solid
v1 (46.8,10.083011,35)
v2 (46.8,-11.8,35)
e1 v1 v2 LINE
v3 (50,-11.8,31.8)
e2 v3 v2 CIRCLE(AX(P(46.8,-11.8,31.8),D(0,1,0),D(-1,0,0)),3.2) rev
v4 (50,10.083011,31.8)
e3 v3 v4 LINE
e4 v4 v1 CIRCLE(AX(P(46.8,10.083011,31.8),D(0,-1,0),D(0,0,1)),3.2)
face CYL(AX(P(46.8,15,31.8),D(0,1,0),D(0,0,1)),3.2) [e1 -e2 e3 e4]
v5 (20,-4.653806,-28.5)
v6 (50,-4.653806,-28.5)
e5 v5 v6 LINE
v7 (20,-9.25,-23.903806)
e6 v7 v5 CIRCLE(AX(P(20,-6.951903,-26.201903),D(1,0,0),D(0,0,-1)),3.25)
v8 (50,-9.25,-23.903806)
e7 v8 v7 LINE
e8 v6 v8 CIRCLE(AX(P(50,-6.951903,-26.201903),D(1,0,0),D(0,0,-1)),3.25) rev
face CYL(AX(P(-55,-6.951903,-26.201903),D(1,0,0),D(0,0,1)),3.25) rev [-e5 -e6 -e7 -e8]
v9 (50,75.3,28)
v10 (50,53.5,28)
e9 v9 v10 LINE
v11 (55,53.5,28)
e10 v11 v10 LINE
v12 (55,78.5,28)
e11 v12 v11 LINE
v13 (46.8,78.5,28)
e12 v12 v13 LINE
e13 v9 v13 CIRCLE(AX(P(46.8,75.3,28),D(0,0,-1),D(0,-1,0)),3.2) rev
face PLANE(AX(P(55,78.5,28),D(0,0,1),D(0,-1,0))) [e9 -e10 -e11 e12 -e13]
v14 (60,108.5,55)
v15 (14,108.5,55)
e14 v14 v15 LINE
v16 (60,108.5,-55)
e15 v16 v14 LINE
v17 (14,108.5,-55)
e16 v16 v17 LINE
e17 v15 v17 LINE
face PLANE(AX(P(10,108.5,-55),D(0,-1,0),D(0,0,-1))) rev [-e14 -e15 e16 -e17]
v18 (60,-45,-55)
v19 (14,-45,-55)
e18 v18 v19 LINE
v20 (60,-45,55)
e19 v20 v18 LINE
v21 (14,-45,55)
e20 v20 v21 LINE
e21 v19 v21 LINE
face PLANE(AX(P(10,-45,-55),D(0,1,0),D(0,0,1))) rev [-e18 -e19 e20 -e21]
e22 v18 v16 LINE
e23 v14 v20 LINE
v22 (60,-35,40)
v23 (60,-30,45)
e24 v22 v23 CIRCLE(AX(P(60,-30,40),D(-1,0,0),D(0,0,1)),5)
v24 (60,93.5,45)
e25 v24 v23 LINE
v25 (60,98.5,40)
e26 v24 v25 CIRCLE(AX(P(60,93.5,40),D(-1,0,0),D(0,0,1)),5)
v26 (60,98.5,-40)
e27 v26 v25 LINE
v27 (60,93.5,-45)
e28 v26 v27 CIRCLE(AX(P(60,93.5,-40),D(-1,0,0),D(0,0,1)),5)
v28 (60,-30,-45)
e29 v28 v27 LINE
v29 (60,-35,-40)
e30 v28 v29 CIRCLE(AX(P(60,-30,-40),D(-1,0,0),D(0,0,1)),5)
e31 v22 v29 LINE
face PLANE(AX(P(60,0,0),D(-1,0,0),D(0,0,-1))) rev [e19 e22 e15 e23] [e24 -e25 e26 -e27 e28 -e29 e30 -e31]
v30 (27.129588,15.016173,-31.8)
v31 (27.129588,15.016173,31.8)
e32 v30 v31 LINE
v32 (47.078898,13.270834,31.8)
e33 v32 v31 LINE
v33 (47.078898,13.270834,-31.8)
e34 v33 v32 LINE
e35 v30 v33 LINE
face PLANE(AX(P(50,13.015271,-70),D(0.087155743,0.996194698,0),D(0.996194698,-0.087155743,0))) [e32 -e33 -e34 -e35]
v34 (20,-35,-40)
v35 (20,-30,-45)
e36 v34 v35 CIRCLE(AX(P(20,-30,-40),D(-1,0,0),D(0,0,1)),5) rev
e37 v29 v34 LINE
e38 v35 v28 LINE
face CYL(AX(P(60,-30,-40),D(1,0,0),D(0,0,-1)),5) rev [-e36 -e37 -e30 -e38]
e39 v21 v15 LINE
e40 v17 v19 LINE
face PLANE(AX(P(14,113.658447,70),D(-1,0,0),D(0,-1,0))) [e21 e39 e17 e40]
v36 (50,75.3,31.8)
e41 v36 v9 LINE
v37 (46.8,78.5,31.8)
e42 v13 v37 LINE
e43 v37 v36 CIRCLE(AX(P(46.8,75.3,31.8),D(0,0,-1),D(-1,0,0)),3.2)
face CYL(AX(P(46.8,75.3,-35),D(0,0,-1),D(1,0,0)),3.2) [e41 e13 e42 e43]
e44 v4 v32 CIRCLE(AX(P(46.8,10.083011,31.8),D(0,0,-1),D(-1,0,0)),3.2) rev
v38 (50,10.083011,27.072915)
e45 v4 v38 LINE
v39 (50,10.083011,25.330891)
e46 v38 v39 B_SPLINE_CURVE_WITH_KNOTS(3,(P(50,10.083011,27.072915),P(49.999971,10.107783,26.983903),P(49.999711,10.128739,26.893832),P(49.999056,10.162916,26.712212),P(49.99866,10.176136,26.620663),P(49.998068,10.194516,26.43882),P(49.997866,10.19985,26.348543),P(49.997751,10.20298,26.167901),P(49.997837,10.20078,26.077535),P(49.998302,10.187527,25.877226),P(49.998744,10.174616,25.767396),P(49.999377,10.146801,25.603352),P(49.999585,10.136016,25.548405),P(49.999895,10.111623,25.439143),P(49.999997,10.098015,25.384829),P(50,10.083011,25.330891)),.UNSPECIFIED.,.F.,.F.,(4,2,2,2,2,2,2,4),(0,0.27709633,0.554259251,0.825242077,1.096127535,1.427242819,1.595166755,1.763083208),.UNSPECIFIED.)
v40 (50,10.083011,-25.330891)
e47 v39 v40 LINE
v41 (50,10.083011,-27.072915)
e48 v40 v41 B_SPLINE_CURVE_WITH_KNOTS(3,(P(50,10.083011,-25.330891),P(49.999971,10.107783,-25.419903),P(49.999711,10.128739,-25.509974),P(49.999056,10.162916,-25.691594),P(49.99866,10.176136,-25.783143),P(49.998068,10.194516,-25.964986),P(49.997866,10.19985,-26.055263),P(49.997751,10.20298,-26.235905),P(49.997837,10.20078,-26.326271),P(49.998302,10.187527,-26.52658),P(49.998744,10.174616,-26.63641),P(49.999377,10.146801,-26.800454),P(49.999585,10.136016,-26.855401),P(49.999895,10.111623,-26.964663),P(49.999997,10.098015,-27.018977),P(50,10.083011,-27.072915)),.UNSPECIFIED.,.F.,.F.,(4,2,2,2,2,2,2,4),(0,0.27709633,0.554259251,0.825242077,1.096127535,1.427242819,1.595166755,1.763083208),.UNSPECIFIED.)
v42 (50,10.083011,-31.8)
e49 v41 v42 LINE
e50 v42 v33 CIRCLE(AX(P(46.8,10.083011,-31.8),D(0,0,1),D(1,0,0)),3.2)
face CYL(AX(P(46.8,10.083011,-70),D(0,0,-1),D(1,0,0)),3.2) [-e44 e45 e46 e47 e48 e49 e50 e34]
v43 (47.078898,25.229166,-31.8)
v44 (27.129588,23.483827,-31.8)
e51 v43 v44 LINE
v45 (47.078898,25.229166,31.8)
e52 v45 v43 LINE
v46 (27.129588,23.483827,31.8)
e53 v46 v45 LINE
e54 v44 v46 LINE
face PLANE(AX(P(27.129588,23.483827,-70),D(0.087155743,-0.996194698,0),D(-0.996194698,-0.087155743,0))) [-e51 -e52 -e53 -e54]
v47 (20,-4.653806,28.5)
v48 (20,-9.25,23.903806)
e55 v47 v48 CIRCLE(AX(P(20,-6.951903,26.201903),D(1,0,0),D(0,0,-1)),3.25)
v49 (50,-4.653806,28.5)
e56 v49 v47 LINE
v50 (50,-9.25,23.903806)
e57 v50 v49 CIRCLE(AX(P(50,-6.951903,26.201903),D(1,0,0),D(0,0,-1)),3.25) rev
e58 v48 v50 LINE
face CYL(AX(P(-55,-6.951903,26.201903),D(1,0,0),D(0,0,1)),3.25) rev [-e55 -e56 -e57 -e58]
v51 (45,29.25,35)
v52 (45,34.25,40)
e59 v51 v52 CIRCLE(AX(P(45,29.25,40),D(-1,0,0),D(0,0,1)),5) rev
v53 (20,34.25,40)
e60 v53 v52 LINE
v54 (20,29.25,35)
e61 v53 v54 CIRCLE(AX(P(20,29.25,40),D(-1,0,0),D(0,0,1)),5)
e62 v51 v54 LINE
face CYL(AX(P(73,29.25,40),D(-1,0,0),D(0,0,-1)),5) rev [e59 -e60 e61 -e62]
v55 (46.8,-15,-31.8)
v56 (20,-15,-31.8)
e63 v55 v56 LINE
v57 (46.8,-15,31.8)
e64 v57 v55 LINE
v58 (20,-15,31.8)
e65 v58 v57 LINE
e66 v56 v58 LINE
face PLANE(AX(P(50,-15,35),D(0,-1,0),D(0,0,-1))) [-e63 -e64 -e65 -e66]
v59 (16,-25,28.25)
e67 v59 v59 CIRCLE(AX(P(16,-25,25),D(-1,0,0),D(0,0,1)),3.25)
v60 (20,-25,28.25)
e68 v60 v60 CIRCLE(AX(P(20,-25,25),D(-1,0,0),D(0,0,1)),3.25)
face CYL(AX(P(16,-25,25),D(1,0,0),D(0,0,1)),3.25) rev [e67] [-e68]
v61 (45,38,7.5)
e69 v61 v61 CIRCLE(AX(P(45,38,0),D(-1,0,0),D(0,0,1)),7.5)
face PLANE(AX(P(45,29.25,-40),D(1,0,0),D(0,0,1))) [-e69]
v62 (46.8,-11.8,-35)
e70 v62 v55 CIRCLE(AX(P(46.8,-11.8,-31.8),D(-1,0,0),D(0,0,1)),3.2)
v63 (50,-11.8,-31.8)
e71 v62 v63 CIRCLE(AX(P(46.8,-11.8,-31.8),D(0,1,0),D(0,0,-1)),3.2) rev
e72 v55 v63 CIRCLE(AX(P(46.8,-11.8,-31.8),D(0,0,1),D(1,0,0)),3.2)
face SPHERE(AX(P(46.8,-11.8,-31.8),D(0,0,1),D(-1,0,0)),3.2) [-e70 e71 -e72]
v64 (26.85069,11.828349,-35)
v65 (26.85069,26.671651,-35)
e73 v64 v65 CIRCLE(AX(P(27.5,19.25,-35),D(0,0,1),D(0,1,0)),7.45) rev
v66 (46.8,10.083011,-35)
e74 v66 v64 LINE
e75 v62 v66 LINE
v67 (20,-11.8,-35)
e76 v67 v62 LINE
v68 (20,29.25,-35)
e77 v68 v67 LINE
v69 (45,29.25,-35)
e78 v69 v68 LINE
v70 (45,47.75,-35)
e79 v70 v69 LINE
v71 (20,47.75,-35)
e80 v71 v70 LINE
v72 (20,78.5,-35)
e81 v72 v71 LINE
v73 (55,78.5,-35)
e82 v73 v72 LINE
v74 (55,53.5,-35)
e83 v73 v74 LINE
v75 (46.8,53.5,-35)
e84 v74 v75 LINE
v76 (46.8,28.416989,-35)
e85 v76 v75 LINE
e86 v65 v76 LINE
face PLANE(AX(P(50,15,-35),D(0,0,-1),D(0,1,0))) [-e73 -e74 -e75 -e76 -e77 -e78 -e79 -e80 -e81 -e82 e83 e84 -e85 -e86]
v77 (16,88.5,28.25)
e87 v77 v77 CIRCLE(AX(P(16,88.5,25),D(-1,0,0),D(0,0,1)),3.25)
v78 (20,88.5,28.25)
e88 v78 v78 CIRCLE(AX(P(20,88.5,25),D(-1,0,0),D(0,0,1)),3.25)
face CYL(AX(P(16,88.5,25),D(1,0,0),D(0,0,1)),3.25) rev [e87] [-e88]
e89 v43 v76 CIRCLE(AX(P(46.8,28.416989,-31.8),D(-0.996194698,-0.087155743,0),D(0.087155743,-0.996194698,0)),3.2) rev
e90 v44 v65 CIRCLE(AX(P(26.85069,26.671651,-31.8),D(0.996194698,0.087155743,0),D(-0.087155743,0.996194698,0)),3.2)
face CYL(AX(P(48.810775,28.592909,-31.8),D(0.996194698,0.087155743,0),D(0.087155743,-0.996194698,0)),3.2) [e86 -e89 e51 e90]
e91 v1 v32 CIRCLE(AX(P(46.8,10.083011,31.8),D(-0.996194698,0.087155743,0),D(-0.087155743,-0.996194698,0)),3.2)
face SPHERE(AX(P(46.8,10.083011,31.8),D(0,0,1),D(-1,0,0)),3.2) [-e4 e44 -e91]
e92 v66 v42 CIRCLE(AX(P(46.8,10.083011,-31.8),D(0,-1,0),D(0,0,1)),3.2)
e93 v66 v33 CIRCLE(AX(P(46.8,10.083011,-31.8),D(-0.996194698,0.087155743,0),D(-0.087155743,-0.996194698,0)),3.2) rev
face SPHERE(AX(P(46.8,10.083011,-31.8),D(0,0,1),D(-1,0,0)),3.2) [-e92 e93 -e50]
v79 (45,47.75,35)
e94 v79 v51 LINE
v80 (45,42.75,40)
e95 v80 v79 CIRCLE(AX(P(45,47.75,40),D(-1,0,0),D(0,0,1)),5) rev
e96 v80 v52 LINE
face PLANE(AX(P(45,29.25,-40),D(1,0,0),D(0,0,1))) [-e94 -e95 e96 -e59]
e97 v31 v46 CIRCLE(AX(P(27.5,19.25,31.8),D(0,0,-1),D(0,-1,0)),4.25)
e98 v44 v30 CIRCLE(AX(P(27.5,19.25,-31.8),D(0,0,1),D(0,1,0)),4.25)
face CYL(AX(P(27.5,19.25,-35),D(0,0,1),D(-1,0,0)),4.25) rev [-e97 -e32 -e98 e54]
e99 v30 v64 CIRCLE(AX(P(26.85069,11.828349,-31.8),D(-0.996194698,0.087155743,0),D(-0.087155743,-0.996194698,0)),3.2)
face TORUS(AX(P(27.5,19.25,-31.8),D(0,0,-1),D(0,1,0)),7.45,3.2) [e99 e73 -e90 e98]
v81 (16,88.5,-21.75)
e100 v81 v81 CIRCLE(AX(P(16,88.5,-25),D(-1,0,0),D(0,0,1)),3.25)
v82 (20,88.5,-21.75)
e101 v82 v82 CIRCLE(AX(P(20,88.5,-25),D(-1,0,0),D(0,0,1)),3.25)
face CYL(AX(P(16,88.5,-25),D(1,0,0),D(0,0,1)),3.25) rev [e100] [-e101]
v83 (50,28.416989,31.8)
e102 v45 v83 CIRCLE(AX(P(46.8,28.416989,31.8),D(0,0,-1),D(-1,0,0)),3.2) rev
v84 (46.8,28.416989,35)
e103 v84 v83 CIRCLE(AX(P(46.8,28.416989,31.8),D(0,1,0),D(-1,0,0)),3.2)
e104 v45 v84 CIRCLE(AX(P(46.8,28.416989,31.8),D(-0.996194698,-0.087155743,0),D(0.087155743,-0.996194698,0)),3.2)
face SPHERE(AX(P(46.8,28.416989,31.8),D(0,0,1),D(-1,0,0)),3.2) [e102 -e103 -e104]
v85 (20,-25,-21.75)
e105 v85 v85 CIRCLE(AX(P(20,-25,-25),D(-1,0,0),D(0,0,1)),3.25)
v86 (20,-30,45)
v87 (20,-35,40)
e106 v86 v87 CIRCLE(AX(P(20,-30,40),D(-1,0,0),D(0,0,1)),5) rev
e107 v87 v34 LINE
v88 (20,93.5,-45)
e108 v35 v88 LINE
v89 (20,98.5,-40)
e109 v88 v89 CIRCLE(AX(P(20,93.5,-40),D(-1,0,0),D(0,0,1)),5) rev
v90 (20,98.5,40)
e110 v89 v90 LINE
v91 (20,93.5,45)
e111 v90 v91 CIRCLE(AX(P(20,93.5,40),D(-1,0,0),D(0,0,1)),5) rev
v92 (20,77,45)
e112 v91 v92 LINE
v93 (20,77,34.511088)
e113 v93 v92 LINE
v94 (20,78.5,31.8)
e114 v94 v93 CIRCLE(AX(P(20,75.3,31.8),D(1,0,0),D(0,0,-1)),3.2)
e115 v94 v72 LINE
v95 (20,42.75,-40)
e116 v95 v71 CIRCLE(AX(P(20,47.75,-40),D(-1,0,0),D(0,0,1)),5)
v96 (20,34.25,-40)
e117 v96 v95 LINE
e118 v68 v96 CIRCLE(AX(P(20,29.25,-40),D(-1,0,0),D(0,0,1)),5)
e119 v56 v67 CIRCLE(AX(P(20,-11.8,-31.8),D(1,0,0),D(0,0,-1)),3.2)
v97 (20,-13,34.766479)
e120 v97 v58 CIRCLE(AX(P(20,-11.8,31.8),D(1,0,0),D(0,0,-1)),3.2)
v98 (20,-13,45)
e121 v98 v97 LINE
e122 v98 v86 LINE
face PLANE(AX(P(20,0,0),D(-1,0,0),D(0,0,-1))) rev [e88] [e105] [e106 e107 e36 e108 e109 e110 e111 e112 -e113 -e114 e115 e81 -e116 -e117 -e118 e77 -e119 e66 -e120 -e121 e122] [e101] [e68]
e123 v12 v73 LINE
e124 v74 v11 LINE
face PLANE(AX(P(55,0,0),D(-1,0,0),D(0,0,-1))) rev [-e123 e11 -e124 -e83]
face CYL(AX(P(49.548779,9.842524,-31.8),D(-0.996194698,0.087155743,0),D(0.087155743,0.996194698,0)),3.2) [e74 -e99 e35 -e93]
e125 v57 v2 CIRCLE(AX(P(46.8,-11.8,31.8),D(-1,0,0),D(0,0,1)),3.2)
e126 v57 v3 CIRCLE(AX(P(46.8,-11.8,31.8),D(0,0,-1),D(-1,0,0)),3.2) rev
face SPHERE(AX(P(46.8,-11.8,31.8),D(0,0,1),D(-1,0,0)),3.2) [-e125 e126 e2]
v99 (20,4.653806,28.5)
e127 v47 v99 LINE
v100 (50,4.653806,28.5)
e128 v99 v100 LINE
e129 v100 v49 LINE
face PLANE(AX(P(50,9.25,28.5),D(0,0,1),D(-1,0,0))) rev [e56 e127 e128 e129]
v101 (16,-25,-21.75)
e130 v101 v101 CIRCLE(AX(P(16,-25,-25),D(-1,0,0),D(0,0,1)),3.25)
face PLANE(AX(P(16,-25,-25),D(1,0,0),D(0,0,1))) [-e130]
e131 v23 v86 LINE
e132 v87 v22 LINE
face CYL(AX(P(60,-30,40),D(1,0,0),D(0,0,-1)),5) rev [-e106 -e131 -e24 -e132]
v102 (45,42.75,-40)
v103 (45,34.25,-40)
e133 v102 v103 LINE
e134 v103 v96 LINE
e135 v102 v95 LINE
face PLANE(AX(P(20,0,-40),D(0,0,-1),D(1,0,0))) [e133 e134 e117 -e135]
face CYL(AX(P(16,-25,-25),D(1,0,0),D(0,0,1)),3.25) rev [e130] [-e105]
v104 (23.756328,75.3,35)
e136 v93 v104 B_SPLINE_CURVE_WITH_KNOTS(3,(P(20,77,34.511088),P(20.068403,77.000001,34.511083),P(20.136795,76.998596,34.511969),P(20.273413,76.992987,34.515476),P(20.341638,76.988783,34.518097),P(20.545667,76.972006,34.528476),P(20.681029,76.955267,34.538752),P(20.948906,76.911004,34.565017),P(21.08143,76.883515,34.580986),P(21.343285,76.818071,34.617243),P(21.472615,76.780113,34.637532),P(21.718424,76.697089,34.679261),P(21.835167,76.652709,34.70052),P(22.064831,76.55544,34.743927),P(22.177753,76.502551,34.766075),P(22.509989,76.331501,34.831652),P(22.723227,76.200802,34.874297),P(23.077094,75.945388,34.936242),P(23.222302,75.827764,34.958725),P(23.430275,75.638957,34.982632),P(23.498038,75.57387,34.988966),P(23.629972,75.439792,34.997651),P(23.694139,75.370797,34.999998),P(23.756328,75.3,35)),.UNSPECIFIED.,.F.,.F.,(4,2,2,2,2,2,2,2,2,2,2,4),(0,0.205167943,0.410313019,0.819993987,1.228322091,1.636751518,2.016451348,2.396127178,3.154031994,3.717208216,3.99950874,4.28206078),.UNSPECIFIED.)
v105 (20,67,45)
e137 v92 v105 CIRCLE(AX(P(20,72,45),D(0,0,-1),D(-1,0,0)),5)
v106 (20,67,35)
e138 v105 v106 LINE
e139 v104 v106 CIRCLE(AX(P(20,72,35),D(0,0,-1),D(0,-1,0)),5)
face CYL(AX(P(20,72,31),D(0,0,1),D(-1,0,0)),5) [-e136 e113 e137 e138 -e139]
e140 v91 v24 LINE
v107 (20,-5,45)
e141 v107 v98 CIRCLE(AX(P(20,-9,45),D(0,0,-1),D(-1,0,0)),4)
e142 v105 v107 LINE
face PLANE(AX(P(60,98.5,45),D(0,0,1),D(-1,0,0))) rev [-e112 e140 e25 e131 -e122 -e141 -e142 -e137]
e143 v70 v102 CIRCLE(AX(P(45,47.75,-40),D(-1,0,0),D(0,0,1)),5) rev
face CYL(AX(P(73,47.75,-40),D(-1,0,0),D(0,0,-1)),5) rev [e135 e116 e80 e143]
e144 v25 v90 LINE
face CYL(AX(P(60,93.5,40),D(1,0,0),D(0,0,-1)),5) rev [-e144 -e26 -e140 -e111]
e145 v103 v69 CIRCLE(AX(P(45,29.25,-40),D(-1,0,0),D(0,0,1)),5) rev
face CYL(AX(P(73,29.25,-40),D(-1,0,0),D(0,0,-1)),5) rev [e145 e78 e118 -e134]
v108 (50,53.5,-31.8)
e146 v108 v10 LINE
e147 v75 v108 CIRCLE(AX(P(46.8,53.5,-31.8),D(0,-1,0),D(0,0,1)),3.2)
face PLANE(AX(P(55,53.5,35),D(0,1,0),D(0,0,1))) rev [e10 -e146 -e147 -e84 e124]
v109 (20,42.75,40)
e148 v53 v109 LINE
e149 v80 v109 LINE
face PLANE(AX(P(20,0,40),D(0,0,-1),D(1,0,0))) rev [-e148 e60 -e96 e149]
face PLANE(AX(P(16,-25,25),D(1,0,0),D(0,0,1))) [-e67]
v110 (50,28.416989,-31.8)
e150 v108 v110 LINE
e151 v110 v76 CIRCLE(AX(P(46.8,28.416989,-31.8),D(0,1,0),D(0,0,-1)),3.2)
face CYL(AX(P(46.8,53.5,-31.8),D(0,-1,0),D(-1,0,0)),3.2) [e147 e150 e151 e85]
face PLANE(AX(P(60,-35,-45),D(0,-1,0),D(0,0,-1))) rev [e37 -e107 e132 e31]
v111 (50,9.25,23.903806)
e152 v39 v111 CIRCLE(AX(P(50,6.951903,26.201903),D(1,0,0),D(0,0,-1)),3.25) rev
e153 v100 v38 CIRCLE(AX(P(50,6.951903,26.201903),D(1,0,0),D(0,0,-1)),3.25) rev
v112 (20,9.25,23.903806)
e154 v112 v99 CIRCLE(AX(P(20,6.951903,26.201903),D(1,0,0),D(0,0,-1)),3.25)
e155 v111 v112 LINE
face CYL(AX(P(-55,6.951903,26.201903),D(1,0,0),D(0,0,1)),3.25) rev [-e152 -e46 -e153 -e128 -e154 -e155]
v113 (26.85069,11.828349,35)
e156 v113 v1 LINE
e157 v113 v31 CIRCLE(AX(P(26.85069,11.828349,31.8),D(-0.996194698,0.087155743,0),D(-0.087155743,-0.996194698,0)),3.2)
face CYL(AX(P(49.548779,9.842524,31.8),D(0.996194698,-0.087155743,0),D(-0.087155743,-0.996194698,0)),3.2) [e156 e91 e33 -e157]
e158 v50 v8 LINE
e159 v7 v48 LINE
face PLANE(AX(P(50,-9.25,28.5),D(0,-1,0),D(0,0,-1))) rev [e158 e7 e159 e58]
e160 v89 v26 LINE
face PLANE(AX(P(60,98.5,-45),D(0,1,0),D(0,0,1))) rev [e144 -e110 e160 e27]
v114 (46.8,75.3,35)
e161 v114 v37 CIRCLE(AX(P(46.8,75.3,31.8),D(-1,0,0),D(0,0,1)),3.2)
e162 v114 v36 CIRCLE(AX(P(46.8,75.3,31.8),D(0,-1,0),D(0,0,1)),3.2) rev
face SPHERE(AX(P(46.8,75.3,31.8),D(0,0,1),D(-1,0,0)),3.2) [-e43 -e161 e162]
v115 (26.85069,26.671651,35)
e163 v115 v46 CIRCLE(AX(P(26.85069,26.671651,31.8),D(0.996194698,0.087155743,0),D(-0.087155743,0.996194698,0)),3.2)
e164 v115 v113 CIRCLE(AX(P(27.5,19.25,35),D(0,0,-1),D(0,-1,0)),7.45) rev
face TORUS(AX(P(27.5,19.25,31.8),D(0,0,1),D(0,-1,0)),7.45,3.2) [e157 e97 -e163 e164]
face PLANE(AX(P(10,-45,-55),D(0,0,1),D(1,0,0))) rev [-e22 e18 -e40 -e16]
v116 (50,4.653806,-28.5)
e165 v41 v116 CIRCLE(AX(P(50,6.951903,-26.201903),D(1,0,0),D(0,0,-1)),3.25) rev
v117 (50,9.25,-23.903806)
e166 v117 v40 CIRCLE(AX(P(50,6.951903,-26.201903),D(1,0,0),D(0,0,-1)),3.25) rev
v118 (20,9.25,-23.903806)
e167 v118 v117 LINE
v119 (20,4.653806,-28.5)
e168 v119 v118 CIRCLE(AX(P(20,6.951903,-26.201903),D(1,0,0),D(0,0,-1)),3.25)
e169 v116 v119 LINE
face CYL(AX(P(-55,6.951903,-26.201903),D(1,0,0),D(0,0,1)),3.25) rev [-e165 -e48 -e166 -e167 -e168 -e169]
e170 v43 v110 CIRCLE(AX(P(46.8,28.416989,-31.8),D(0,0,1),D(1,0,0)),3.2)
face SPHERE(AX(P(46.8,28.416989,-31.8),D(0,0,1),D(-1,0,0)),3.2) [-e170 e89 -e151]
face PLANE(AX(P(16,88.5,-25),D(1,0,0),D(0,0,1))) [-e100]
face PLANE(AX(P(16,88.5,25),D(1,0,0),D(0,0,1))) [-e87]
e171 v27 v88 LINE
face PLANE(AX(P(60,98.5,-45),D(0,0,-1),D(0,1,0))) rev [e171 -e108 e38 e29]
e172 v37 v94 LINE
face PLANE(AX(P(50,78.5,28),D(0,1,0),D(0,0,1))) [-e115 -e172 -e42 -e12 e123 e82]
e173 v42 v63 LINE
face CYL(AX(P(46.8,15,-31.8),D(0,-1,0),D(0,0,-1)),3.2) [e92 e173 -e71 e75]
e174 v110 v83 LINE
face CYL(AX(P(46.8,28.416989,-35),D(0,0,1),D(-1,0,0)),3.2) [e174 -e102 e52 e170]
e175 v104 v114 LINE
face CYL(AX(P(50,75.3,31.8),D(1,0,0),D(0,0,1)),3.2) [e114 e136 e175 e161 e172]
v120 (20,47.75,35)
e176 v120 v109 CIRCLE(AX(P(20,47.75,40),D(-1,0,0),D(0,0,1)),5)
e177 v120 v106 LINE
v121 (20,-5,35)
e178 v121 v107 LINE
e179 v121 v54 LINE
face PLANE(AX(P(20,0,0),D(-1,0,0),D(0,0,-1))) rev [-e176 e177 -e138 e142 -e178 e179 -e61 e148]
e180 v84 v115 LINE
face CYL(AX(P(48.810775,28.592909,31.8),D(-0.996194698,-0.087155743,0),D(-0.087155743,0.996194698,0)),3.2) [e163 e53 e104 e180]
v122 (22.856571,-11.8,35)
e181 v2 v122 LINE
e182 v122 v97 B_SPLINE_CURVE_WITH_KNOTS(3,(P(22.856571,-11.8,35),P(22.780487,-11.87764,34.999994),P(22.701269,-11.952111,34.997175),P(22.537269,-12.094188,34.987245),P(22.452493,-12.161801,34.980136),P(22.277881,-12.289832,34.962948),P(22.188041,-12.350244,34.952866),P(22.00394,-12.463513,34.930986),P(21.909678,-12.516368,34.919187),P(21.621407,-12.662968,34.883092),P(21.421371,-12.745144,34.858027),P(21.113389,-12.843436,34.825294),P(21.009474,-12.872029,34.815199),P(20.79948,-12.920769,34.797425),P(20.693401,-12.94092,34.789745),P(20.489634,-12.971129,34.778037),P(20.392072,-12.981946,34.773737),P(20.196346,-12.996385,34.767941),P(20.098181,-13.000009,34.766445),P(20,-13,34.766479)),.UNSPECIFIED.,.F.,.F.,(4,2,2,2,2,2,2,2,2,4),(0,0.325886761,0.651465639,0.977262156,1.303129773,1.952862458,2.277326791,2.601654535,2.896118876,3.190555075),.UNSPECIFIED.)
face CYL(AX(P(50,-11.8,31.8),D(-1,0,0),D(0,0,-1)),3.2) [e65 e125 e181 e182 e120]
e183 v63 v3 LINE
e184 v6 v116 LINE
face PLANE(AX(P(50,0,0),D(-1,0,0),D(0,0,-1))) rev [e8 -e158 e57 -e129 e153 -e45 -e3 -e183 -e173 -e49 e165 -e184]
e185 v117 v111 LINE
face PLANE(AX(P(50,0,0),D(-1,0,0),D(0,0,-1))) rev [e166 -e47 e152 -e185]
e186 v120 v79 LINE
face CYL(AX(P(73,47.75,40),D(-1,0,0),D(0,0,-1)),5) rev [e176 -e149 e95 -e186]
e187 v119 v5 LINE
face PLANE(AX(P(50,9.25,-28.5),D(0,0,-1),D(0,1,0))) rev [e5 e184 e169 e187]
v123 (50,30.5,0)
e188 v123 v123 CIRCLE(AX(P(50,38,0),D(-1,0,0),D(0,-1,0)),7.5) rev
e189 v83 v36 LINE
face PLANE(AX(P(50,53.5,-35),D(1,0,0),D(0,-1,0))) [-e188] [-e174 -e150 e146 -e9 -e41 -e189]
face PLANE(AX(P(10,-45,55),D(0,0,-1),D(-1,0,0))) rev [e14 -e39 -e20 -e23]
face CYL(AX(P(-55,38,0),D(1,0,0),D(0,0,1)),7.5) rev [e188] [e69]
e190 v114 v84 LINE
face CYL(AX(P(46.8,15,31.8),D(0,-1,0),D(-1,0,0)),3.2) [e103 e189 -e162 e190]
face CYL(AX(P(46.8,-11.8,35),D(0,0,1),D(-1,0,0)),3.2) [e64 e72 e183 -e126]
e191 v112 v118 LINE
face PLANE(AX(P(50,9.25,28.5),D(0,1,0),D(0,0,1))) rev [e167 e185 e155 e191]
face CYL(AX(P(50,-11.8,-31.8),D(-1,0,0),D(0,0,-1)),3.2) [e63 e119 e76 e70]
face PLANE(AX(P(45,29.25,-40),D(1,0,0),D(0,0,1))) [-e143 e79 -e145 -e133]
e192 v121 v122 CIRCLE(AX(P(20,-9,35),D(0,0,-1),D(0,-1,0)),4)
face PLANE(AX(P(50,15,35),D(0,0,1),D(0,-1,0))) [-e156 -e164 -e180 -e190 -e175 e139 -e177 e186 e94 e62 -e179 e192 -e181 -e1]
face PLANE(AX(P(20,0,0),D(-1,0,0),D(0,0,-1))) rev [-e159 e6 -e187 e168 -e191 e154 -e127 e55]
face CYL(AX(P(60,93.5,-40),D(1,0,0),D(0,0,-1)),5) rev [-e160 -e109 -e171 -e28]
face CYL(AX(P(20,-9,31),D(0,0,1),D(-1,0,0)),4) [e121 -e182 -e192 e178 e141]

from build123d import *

# Parameters (mm, degrees)
BOSS_EXTRUDE1_DEPTH       = 30
BOSS_EXTRUDE1_DEPTH_BACK  = 30
SKETCH1_W                 = 70
SKETCH1_H                 = 30
SKETCH1_W_2               = 57
SKETCH1_H_2               = 18.5
BOSS_EXTRUDE2_DEPTH       = 35
BOSS_EXTRUDE2_DEPTH_BACK  = 35
SKETCH3_W                 = 60
SKETCH3_H                 = 30
SKETCH3_W_2               = 50
SKETCH3_H_2               = 18.5
BOSS_EXTRUDE3_DEPTH       = 35
BOSS_EXTRUDE3_DEPTH_BACK  = 35
SKETCH5_W                 = 60
SKETCH5_H                 = 25
SKETCH5_R                 = 7.95
BOSS_EXTRUDE4_DEPTH       = 7
CUT_EXTRUDE1_REACH        = 106.246
SKETCH6_W                 = 11
SKETCH6_H                 = 5
SKETCH7_W                 = 11
SKETCH7_H                 = 8.362797957
CUT_EXTRUDE2_DEPTH        = 6
FILLET2_R                 = 2
CUT_EXTRUDE3_DEPTH        = 105
CUT_EXTRUDE5_DEPTH        = 75
CUT_EXTRUDE5_DEPTH_BACK   = 75
SKETCH12_R                = 7.5
CUT_EXTRUDE6_DEPTH        = 75
CUT_EXTRUDE6_DEPTH_BACK   = 75
SKETCH13_R                = 3.25
SKETCH11_W                = 180.789243702
SKETCH11_H                = 203.682831454
CUT_EXTRUDE4_DEPTH        = 75
SKETCH14_W                = 110
SKETCH14_H                = 153.5
SKETCH14_W_2              = 90
SKETCH14_H_2              = 133.5
BOSS_EXTRUDE7_DEPTH       = 40
SKETCH15_W                = 110
SKETCH15_H                = 153.5
BOSS_EXTRUDE8_DEPTH       = 10
SKETCH16_W                = 70
SKETCH16_H                = 25
BOSS_EXTRUDE9_DEPTH       = 35
SKETCH18_W                = 7
SKETCH18_H                = 25
CUT_EXTRUDE8_DEPTH        = 5
FILLET9_R                 = 3.2
BOSS_EXTRUDE10_DEPTH      = 40
BOSS_EXTRUDE10_DEPTH_BACK = 40
SKETCH19_W                = 25
SKETCH19_H                = 18.5
CUT_EXTRUDE10_DEPTH       = 53
SKETCH26_R                = 3.25
CUT_EXTRUDE14_DEPTH       = 4
SKETCH28_R                = 5
SKETCH28_R_2              = 4
BOSS_EXTRUDE13_DEPTH      = 24
SKETCH23_W                = 160.880742473
SKETCH23_H                = 158.955075262
CUT_EXTRUDE13_DEPTH       = 132.519010033
FILLET10_R                = 5
CUT_EXTRUDE15_DEPTH       = 70
CUT_EXTRUDE15_DEPTH_BACK  = 80
SKETCH30_W                = 39.070468588
SKETCH30_H                = 169.95653836


with BuildPart() as part:
    # Sketch1 → Boss-Extrude1 (new, two sides: drawn at the far end of the back side and taken through both)
    with BuildSketch(Plane(origin=(0, 0, 0), x_dir=(0, 0, -1), z_dir=(1, 0, 0)).offset(-BOSS_EXTRUDE1_DEPTH_BACK)):
        Rectangle(SKETCH1_W, SKETCH1_H)
        Rectangle(SKETCH1_W_2, SKETCH1_H_2, mode=Mode.SUBTRACT)
    extrude(amount=BOSS_EXTRUDE1_DEPTH + BOSS_EXTRUDE1_DEPTH_BACK)



with BuildPart() as body_2:
    # Sketch3 → Boss-Extrude2 (new, two sides: drawn at the far end of the back side and taken through both)
    with BuildSketch(Plane.XY.offset(-BOSS_EXTRUDE2_DEPTH_BACK)):
        with Locations((0, 38.5)):
            Rectangle(SKETCH3_W, SKETCH3_H)
        with Locations((0, 38.5)):
            Rectangle(SKETCH3_W_2, SKETCH3_H_2, mode=Mode.SUBTRACT)
    extrude(amount=BOSS_EXTRUDE2_DEPTH + BOSS_EXTRUDE2_DEPTH_BACK)


with BuildPart() as part_1:
    add(part.part)

    add(body_2.part)  # Boss-Extrude3 merges body 2
    # Sketch4 → Boss-Extrude3 (add, two sides: drawn at the far end of the back side and taken through both)
    with BuildSketch(Plane.XY.offset(-BOSS_EXTRUDE3_DEPTH_BACK)):
        with BuildLine():
            Line((-7.5, 23.5), (7.5, 23.5))
            ThreePointArc((7.5, 23.5), (3.25, 19.25), (7.5, 15))
            Line((7.5, 15), (-7.5, 15))
            ThreePointArc((-7.5, 15), (-3.25, 19.25), (-7.5, 23.5))
        make_face()
    extrude(amount=BOSS_EXTRUDE3_DEPTH + BOSS_EXTRUDE3_DEPTH_BACK)

    # Sketch5 → Boss-Extrude4 (add)
    with BuildSketch(Plane.XY.offset(35)):
        with Locations((0, 66)):
            Rectangle(SKETCH5_W, SKETCH5_H)
        with Locations((-10.95, 63.975)):
            Circle(SKETCH5_R, mode=Mode.SUBTRACT)
        with Locations((10.95, 63.975)):
            Circle(SKETCH5_R, mode=Mode.SUBTRACT)
    extrude(amount=-BOSS_EXTRUDE4_DEPTH)

    # Cut-Extrude1: up to this face of the body (flat: up to its plane)
    cut_extrude1_end = Plane(part_1.part.faces().sort_by_distance((0, 53.5, -3.5))[0])
    # Sketch6 → Cut-Extrude1 (cut, up to the picked face)
    with BuildSketch(Plane(origin=(0, 78.5, 0), x_dir=(1, 0, 0), z_dir=(0, 1, 0)), mode=Mode.PRIVATE) as cut_extrude1_sk1:
        with Locations((0, -28)):
            Rectangle(SKETCH6_W, SKETCH6_H)
    cut_extrude1_tool1 = split(extrude(cut_extrude1_sk1.sketch, amount=-CUT_EXTRUDE1_REACH, mode=Mode.PRIVATE), bisect_by=cut_extrude1_end, keep=Keep.BOTH, mode=Mode.PRIVATE)
    add(cut_extrude1_tool1.solids().sort_by(Axis((0, 78.5, 28), (0, -1, 0)))[0], mode=Mode.SUBTRACT)

    # Sketch7 → Cut-Extrude2 (cut)
    with BuildSketch(Plane(origin=(0, 78.5, 0), x_dir=(1, 0, 0), z_dir=(0, 1, 0))):
        with Locations((0, -28.818601022)):
            Rectangle(SKETCH7_W, SKETCH7_H)
    extrude(amount=-CUT_EXTRUDE2_DEPTH, mode=Mode.SUBTRACT)

    # Fillet2
    fillet2_edges = [part_1.edges().sort_by_distance(p)[0] for p in [
        (-5.5, 55.843540774, 30.5),
        (5.5, 55.843540774, 30.5),
        (5.5, 71.131459226, 30.5),
        (-5.5, 71.131459226, 30.5),
        (-5.5, 75.5, 33),
        (5.5, 75.5, 33),
    ]]
    fillet(fillet2_edges, radius=FILLET2_R)

    # Sketch10 → Cut-Extrude3 (cut)
    with BuildSketch(Plane.XY.offset(35)):
        Polygon((30, 25.484729239), (30, 13.015270761), (7.129588093, 15.016172533), (7.129588093, 23.483827467), align=None)
    cut_extrude3 = extrude(amount=-CUT_EXTRUDE3_DEPTH, mode=Mode.SUBTRACT)

    # Mirror1: Cut-Extrude3 across plane
    add(cut_extrude3.mirror(Plane(origin=(0, 0, 0), x_dir=(0, 0, 1), z_dir=(1, 0, 0))), mode=Mode.SUBTRACT)

    # Sketch12 → Cut-Extrude5 (cut, two sides: drawn at the far end of the back side and taken through both)
    with BuildSketch(Plane(origin=(0, 0, 0), x_dir=(0, 0, -1), z_dir=(1, 0, 0)).offset(-CUT_EXTRUDE5_DEPTH_BACK)):
        with Locations(Location((0, 38, 0), (0, 0, 270))):
            Circle(SKETCH12_R)
    extrude(amount=CUT_EXTRUDE5_DEPTH + CUT_EXTRUDE5_DEPTH_BACK, mode=Mode.SUBTRACT)

    # Sketch13 → Cut-Extrude6 (cut, two sides: drawn at the far end of the back side and taken through both)
    with BuildSketch(Plane(origin=(0, 0, 0), x_dir=(0, 0, -1), z_dir=(1, 0, 0)).offset(-CUT_EXTRUDE6_DEPTH_BACK)):
        with Locations((-26.201902961, 6.951902961)):
            Circle(SKETCH13_R)
        with Locations((-26.201902961, -6.951902961)):
            Circle(SKETCH13_R)
        with Locations((26.201902961, 6.951902961)):
            Circle(SKETCH13_R)
        with Locations((26.201902961, -6.951902961)):
            Circle(SKETCH13_R)
    extrude(amount=CUT_EXTRUDE6_DEPTH + CUT_EXTRUDE6_DEPTH_BACK, mode=Mode.SUBTRACT)

    # Sketch11 → Cut-Extrude4 (cut)
    with BuildSketch(Plane(origin=(0, 0, 0), x_dir=(0, 0, -1), z_dir=(1, 0, 0))):
        Rectangle(SKETCH11_W, SKETCH11_H)
    extrude(amount=CUT_EXTRUDE4_DEPTH, mode=Mode.SUBTRACT)



with BuildPart() as body_2_2:
    # Sketch14 → Boss-Extrude7 (new body)
    with BuildSketch(Plane(origin=(0, 0, 0), x_dir=(0, 0, -1), z_dir=(1, 0, 0))):
        with Locations((0, 31.75)):
            Rectangle(SKETCH14_W, SKETCH14_H)
        with Locations((0, 31.75)):
            Rectangle(SKETCH14_W_2, SKETCH14_H_2, mode=Mode.SUBTRACT)
    extrude(amount=-BOSS_EXTRUDE7_DEPTH)


with BuildPart() as part_2:
    add(part_1.part)

    add(body_2_2.part)  # Boss-Extrude8 merges body 2 2
    # Sketch15 → Boss-Extrude8 (add)
    with BuildSketch(Plane(origin=(0, 0, 0), x_dir=(0, 0, -1), z_dir=(1, 0, 0))):
        with Locations((0, 31.75)):
            Rectangle(SKETCH15_W, SKETCH15_H)
    extrude(amount=BOSS_EXTRUDE8_DEPTH)

    # Sketch16 → Boss-Extrude9 (add)
    with BuildSketch(Plane.ZY):
        with Locations((0, 66)):
            Rectangle(SKETCH16_W, SKETCH16_H)
    extrude(amount=BOSS_EXTRUDE9_DEPTH)

    # Sketch18 → Cut-Extrude8 (cut)
    with BuildSketch(Plane.ZY.offset(30)):
        with Locations((31.5, 66)):
            Rectangle(SKETCH18_W, SKETCH18_H)
    extrude(amount=CUT_EXTRUDE8_DEPTH, mode=Mode.SUBTRACT)

    # Fillet9
    # the kernel refuses this fillet: 3.2 mm, written as the material it takes off along each edge
    with BuildSketch(Plane(origin=(-26.8, -11.8, 31.8), x_dir=(0, 0, 1), z_dir=(-1, 0, 0))) as fillet9_piece_1_section:
        Polygon((0, 0), (FILLET9_R, 0), (FILLET9_R, -FILLET9_R), (0, -FILLET9_R), align=None)
    fillet9_piece_1 = extrude(amount=FILLET9_R, mode=Mode.PRIVATE)
    fillet9_piece_1 = fillet9_piece_1 - Plane(origin=(-26.8, -11.8, 31.8), x_dir=(0, 0.7071067811865475, -0.7071067811865475), z_dir=(-1, 0, 0)) * Sphere(FILLET9_R, mode=Mode.PRIVATE)
    add(fillet9_piece_1, mode=Mode.SUBTRACT)
    with BuildSketch(Plane(origin=(-26.8, 10.083011004, 31.8), x_dir=(-0.08715574274765824, 0.9961946980917455, 0), z_dir=(0, 0, 1))) as fillet9_piece_2_section:
        Polygon((0, 0), (FILLET9_R, 0), (FILLET9_R, FILLET9_R * 0.916331174017), (FILLET9_R * 0.0871557427477, FILLET9_R * 0.996194698092), align=None)
    fillet9_piece_2 = extrude(amount=FILLET9_R, mode=Mode.PRIVATE)
    fillet9_piece_2 = fillet9_piece_2 - Plane(origin=(-26.8, 10.083011004, 31.8), x_dir=(0.737277336810124, -0.6755902076156602, 0), z_dir=(0, 0, 1)) * Sphere(FILLET9_R, mode=Mode.PRIVATE)
    add(fillet9_piece_2, mode=Mode.SUBTRACT)
    with BuildSketch(Plane(origin=(-26.8, 10.083011004, -31.8), x_dir=(-0.08715574274765824, 0.9961946980917455, 0), z_dir=(0, 0, -1))) as fillet9_piece_3_section:
        Polygon((0, 0), (FILLET9_R, 0), (FILLET9_R, -FILLET9_R * 0.916331174017), (FILLET9_R * 0.0871557427477, -FILLET9_R * 0.996194698092), align=None)
    fillet9_piece_3 = extrude(amount=FILLET9_R, mode=Mode.PRIVATE)
    fillet9_piece_3 = fillet9_piece_3 - Plane(origin=(-26.8, 10.083011004, -31.8), x_dir=(0.737277336810124, -0.6755902076156602, 0), z_dir=(0, 0, -1)) * Sphere(FILLET9_R, mode=Mode.PRIVATE)
    add(fillet9_piece_3, mode=Mode.SUBTRACT)
    with BuildSketch(Plane(origin=(-26.8, -11.8, -31.8), x_dir=(0, 0, -1), z_dir=(-1, 0, 0))) as fillet9_piece_4_section:
        Polygon((0, 0), (FILLET9_R, 0), (FILLET9_R, FILLET9_R), (0, FILLET9_R), align=None)
    fillet9_piece_4 = extrude(amount=FILLET9_R, mode=Mode.PRIVATE)
    fillet9_piece_4 = fillet9_piece_4 - Plane(origin=(-26.8, -11.8, -31.8), x_dir=(0, 0.7071067811865475, 0.7071067811865475), z_dir=(-1, 0, 0)) * Sphere(FILLET9_R, mode=Mode.PRIVATE)
    add(fillet9_piece_4, mode=Mode.SUBTRACT)
    with BuildSketch(Plane(origin=(-26.8, 75.3, 31.8), x_dir=(0, 0, 1), z_dir=(-1, 0, 0))) as fillet9_piece_5_section:
        Polygon((0, 0), (FILLET9_R, 0), (FILLET9_R, FILLET9_R), (0, FILLET9_R), align=None)
    fillet9_piece_5 = extrude(amount=FILLET9_R, mode=Mode.PRIVATE)
    fillet9_piece_5 = fillet9_piece_5 - Plane(origin=(-26.8, 75.3, 31.8), x_dir=(0, -0.7071067811865475, -0.7071067811865475), z_dir=(-1, 0, 0)) * Sphere(FILLET9_R, mode=Mode.PRIVATE)
    add(fillet9_piece_5, mode=Mode.SUBTRACT)
    with BuildSketch(Plane(origin=(-26.8, 28.416988996, 31.8), x_dir=(-0.08715574274765808, -0.9961946980917455, 0), z_dir=(0, 0, 1))) as fillet9_piece_6_section:
        Polygon((0, 0), (FILLET9_R, 0), (FILLET9_R, -FILLET9_R * 0.916331174017), (FILLET9_R * 0.0871557427477, -FILLET9_R * 0.996194698092), align=None)
    fillet9_piece_6 = extrude(amount=FILLET9_R, mode=Mode.PRIVATE)
    fillet9_piece_6 = fillet9_piece_6 - Plane(origin=(-26.8, 28.416988996, 31.8), x_dir=(0.737277336810124, 0.6755902076156605, 0), z_dir=(0, 0, 1)) * Sphere(FILLET9_R, mode=Mode.PRIVATE)
    add(fillet9_piece_6, mode=Mode.SUBTRACT)
    with BuildSketch(Plane(origin=(-26.8, 28.416988996, -31.8), x_dir=(-1, 0, 0), z_dir=(0, 0, -1))) as fillet9_piece_7_section:
        Polygon((0, 0), (FILLET9_R, 0), (FILLET9_R, -FILLET9_R * 0.916331174017), (FILLET9_R * 0.0871557427477, -FILLET9_R * 0.996194698092), align=None)
    fillet9_piece_7 = extrude(amount=FILLET9_R, mode=Mode.PRIVATE)
    fillet9_piece_7 = fillet9_piece_7 - Plane(origin=(-26.8, 28.416988996, -31.8), x_dir=(0.737277336810124, 0.6755902076156605, 0), z_dir=(0, 0, -1)) * Sphere(FILLET9_R, mode=Mode.PRIVATE)
    add(fillet9_piece_7, mode=Mode.SUBTRACT)
    with BuildSketch(Plane(origin=(-30, -11.8, 35), x_dir=(0, 0, -1), z_dir=(0, 1, 0)), Plane(origin=(-30, 10.083011004, -35), x_dir=(0, 0, 1), z_dir=(0, -1, 0))) as fillet9_piece_8:
        with BuildLine():
            CenterArc((FILLET9_R, -FILLET9_R), FILLET9_R, 90, 90)
            Line((0, -FILLET9_R), (0, 0))
            Line((0, 0), (FILLET9_R, 0))
        make_face()
    extrude(amount=21.883011004, mode=Mode.SUBTRACT)
    with BuildSketch(Plane(origin=(-30, 13.015270761, 31.8), x_dir=(0.9961946980917455, 0.0871557427476583, 0), z_dir=(0, 0, -1)), Plane(origin=(-30, 25.484729239, 31.8), x_dir=(0, 1, 0), z_dir=(0, 0, -1))) as fillet9_piece_9:
        with BuildLine():
            CenterArc((FILLET9_R * 0.916331174017, FILLET9_R), FILLET9_R, 185, 85)
            Line((-FILLET9_R * 0.0798635240743, FILLET9_R * 0.912844257252), (0, 0))
            Line((0, 0), (FILLET9_R * 0.916331174017, 0))
        make_face()
    extrude(amount=63.6, mode=Mode.SUBTRACT)
    with BuildSketch(Plane(origin=(-30, 75.3, 35), x_dir=(0, 0, -1), z_dir=(0, -1, 0))) as fillet9_piece_10:
        with BuildLine():
            CenterArc((FILLET9_R, FILLET9_R), FILLET9_R, 180, 90)
            Line((0, FILLET9_R), (0, 0))
            Line((0, 0), (FILLET9_R, 0))
        make_face()
    extrude(amount=46.883011004, mode=Mode.SUBTRACT)
    with BuildSketch(Plane(origin=(-30, 28.416988996, -35), x_dir=(0, 0, 1), z_dir=(0, 1, 0))) as fillet9_piece_11:
        with BuildLine():
            CenterArc((FILLET9_R, FILLET9_R), FILLET9_R, 180, 90)
            Line((0, FILLET9_R), (0, 0))
            Line((0, 0), (FILLET9_R, 0))
        make_face()
    extrude(amount=25.083011004, mode=Mode.SUBTRACT)
    with BuildSketch(Plane(origin=(-30, -15, -31.8), x_dir=(0, 1, 0), z_dir=(0, 0, 1))) as fillet9_piece_12:
        with BuildLine():
            CenterArc((FILLET9_R, -FILLET9_R), FILLET9_R, 90, 90)
            Line((0, -FILLET9_R), (0, 0))
            Line((0, 0), (FILLET9_R, 0))
        make_face()
    extrude(amount=63.6, mode=Mode.SUBTRACT)
    with BuildSketch(Plane(origin=(-30, 78.5, 31.8), x_dir=(1, 0, 0), z_dir=(0, 0, -1))) as fillet9_piece_13:
        with BuildLine():
            CenterArc((FILLET9_R, FILLET9_R), FILLET9_R, 180, 90)
            Line((0, FILLET9_R), (0, 0))
            Line((0, 0), (FILLET9_R, 0))
        make_face()
    extrude(amount=3.8, mode=Mode.SUBTRACT)
    with BuildSketch(Plane(origin=(0, 78.5, 35), x_dir=(0, 0, -1), z_dir=(-1, 0, 0))) as fillet9_piece_14:
        with BuildLine():
            CenterArc((FILLET9_R, FILLET9_R), FILLET9_R, 180, 90)
            Line((0, FILLET9_R), (0, 0))
            Line((0, 0), (FILLET9_R, 0))
        make_face()
    extrude(amount=26.8, mode=Mode.SUBTRACT)
    with BuildSketch(Plane(origin=(-7.129588093, 15.016172533, -35), x_dir=(0, 0, 1), z_dir=(-0.9961946980917455, -0.08715574274765824, 0)), Plane(origin=(-27.078898377, 13.270834038, 35), x_dir=(0, 0, -1), z_dir=(0.9961946980917455, 0.08715574274765824, 0)), Plane(origin=(-27.078898377, 25.229165962, -35), x_dir=(0, 0, 1), z_dir=(0.9961946980917455, -0.08715574274765808, 0)), Plane(origin=(-7.129588093, 23.483827467, 35), x_dir=(0, 0, -1), z_dir=(-0.9961946980917455, 0.08715574274765808, 0))) as fillet9_piece_15:
        with BuildLine():
            CenterArc((FILLET9_R, -FILLET9_R), FILLET9_R, 90, 90)
            Line((0, -FILLET9_R), (0, 0))
            Line((0, 0), (FILLET9_R, 0))
        make_face()
    extrude(amount=20.025513408, mode=Mode.SUBTRACT)
    with BuildSketch(Plane(origin=(-7.5, 19.25, 35), x_dir=(0.08715574274765839, -0.9961946980917455, 0), z_dir=(-0.9961946980917455, -0.08715574274765839, 0))) as fillet9_piece_16:
        with BuildLine():
            CenterArc((4.25 + FILLET9_R, -FILLET9_R), FILLET9_R, 90, 90)
            Line((4.25 + FILLET9_R, 0), (4.25, 0))
            Line((4.25, 0), (4.25, -FILLET9_R))
        make_face()
    revolve(axis=Axis((-7.5, 19.25, 35), (0, 0, 1)), revolution_arc=170, mode=Mode.SUBTRACT)
    with BuildSketch(Plane(origin=(-7.5, 19.25, -35), x_dir=(0.08715574274767615, -0.9961946980917439, 0), z_dir=(-0.9961946980917439, -0.08715574274767615, 0))) as fillet9_piece_17:
        with BuildLine():
            CenterArc((4.25 + FILLET9_R, FILLET9_R), FILLET9_R, 180, 90)
            Line((4.25 + FILLET9_R, 0), (4.25, 0))
            Line((4.25, 0), (4.25, FILLET9_R))
        make_face()
    revolve(axis=Axis((-7.5, 19.25, -35), (0, 0, 1)), revolution_arc=170, mode=Mode.SUBTRACT)
    with BuildSketch(Plane(origin=(-26.8, -15, 35), x_dir=(0, 1, 0), z_dir=(1, 0, 0)), Plane(origin=(0, -15, -35), x_dir=(0, 1, 0), z_dir=(-1, 0, 0))) as fillet9_piece_18:
        with BuildLine():
            CenterArc((FILLET9_R, -FILLET9_R), FILLET9_R, 90, 90)
            Line((0, -FILLET9_R), (0, 0))
            Line((0, 0), (FILLET9_R, 0))
        make_face()
    extrude(amount=26.8, mode=Mode.SUBTRACT)

    # Sketch19 → Boss-Extrude10 (add, two sides: drawn at the far end of the back side and taken through both)
    with BuildSketch(Plane.XY.offset(-BOSS_EXTRUDE10_DEPTH_BACK)):
        with Locations((-12.5, 38.5)):
            Rectangle(SKETCH19_W, SKETCH19_H)
    extrude(amount=BOSS_EXTRUDE10_DEPTH + BOSS_EXTRUDE10_DEPTH_BACK)

    # Sketch21 → Cut-Extrude10 (cut)
    with BuildSketch(Plane.ZY):
        with BuildLine():
            Line((-40, 42.75), (-40, 47.75))
            Line((-40, 47.75), (-35, 47.75))
            ThreePointArc((-35, 47.75), (-36.464466094, 44.214466094), (-40, 42.75))
        make_face()
        with BuildLine():
            Line((-40, 34.25), (-40, 29.25))
            Line((-40, 29.25), (-35, 29.25))
            ThreePointArc((-35, 29.25), (-36.464466094, 32.785533906), (-40, 34.25))
        make_face()
        with BuildLine():
            Line((35, 47.75), (40, 47.75))
            Line((40, 47.75), (40, 42.75))
            ThreePointArc((40, 42.75), (36.464466094, 44.214466094), (35, 47.75))
        make_face()
        with BuildLine():
            Line((40, 34.25), (40, 29.25))
            Line((40, 29.25), (35, 29.25))
            ThreePointArc((35, 29.25), (36.464466094, 32.785533906), (40, 34.25))
        make_face()
    extrude(amount=CUT_EXTRUDE10_DEPTH, mode=Mode.SUBTRACT)

    # Sketch26 → Cut-Extrude14 (cut)
    with BuildSketch(Plane.ZY):
        with Locations((-25, 88.5)):
            Circle(SKETCH26_R)
        with Locations((25, 88.5)):
            Circle(SKETCH26_R)
        with Locations((-25, -25)):
            Circle(SKETCH26_R)
        with Locations((25, -25)):
            Circle(SKETCH26_R)
    extrude(amount=-CUT_EXTRUDE14_DEPTH, mode=Mode.SUBTRACT)

    # Sketch28 → Boss-Extrude13 (add)
    with BuildSketch(Plane.XY.offset(55)):
        with Locations((0, 72)):
            Circle(SKETCH28_R)
        with Locations((0, -9)):
            Circle(SKETCH28_R_2)
    extrude(amount=-BOSS_EXTRUDE13_DEPTH)

    # Mirror3: part across plane


with BuildPart() as part_3:
    add(part_2.part)
    add(part_2.part.mirror(Plane(origin=(10, 0, 0), x_dir=(0, 0, 1), z_dir=(1, 0, 0))))

    # Sketch23 → Cut-Extrude13 (cut, through all)
    with BuildSketch(Plane(origin=(10, 0, 0), x_dir=(0, 0, -1), z_dir=(1, 0, 0))):
        with Locations((10.503639335, 31.75)):
            Rectangle(SKETCH23_W, SKETCH23_H)
    extrude(amount=-CUT_EXTRUDE13_DEPTH, mode=Mode.SUBTRACT)

    # Fillet10
    fillet10_edges = [part_3.edges().sort_by_distance(p)[0] for p in [
        (40, -35, 45),
        (40, 98.5, 45),
        (40, 98.5, -45),
        (40, -35, -45),
    ]]
    fillet(fillet10_edges, radius=FILLET10_R)

    # Sketch30 → Cut-Extrude15 (cut, two sides: drawn at the far end of the back side and taken through both)
    with BuildSketch(Plane.XY.offset(-CUT_EXTRUDE15_DEPTH_BACK)):
        with Locations((-5.535234294, 28.680177468)):
            Rectangle(SKETCH30_W, SKETCH30_H)
    extrude(amount=CUT_EXTRUDE15_DEPTH + CUT_EXTRUDE15_DEPTH_BACK, mode=Mode.SUBTRACT)


solid = part_3.part
